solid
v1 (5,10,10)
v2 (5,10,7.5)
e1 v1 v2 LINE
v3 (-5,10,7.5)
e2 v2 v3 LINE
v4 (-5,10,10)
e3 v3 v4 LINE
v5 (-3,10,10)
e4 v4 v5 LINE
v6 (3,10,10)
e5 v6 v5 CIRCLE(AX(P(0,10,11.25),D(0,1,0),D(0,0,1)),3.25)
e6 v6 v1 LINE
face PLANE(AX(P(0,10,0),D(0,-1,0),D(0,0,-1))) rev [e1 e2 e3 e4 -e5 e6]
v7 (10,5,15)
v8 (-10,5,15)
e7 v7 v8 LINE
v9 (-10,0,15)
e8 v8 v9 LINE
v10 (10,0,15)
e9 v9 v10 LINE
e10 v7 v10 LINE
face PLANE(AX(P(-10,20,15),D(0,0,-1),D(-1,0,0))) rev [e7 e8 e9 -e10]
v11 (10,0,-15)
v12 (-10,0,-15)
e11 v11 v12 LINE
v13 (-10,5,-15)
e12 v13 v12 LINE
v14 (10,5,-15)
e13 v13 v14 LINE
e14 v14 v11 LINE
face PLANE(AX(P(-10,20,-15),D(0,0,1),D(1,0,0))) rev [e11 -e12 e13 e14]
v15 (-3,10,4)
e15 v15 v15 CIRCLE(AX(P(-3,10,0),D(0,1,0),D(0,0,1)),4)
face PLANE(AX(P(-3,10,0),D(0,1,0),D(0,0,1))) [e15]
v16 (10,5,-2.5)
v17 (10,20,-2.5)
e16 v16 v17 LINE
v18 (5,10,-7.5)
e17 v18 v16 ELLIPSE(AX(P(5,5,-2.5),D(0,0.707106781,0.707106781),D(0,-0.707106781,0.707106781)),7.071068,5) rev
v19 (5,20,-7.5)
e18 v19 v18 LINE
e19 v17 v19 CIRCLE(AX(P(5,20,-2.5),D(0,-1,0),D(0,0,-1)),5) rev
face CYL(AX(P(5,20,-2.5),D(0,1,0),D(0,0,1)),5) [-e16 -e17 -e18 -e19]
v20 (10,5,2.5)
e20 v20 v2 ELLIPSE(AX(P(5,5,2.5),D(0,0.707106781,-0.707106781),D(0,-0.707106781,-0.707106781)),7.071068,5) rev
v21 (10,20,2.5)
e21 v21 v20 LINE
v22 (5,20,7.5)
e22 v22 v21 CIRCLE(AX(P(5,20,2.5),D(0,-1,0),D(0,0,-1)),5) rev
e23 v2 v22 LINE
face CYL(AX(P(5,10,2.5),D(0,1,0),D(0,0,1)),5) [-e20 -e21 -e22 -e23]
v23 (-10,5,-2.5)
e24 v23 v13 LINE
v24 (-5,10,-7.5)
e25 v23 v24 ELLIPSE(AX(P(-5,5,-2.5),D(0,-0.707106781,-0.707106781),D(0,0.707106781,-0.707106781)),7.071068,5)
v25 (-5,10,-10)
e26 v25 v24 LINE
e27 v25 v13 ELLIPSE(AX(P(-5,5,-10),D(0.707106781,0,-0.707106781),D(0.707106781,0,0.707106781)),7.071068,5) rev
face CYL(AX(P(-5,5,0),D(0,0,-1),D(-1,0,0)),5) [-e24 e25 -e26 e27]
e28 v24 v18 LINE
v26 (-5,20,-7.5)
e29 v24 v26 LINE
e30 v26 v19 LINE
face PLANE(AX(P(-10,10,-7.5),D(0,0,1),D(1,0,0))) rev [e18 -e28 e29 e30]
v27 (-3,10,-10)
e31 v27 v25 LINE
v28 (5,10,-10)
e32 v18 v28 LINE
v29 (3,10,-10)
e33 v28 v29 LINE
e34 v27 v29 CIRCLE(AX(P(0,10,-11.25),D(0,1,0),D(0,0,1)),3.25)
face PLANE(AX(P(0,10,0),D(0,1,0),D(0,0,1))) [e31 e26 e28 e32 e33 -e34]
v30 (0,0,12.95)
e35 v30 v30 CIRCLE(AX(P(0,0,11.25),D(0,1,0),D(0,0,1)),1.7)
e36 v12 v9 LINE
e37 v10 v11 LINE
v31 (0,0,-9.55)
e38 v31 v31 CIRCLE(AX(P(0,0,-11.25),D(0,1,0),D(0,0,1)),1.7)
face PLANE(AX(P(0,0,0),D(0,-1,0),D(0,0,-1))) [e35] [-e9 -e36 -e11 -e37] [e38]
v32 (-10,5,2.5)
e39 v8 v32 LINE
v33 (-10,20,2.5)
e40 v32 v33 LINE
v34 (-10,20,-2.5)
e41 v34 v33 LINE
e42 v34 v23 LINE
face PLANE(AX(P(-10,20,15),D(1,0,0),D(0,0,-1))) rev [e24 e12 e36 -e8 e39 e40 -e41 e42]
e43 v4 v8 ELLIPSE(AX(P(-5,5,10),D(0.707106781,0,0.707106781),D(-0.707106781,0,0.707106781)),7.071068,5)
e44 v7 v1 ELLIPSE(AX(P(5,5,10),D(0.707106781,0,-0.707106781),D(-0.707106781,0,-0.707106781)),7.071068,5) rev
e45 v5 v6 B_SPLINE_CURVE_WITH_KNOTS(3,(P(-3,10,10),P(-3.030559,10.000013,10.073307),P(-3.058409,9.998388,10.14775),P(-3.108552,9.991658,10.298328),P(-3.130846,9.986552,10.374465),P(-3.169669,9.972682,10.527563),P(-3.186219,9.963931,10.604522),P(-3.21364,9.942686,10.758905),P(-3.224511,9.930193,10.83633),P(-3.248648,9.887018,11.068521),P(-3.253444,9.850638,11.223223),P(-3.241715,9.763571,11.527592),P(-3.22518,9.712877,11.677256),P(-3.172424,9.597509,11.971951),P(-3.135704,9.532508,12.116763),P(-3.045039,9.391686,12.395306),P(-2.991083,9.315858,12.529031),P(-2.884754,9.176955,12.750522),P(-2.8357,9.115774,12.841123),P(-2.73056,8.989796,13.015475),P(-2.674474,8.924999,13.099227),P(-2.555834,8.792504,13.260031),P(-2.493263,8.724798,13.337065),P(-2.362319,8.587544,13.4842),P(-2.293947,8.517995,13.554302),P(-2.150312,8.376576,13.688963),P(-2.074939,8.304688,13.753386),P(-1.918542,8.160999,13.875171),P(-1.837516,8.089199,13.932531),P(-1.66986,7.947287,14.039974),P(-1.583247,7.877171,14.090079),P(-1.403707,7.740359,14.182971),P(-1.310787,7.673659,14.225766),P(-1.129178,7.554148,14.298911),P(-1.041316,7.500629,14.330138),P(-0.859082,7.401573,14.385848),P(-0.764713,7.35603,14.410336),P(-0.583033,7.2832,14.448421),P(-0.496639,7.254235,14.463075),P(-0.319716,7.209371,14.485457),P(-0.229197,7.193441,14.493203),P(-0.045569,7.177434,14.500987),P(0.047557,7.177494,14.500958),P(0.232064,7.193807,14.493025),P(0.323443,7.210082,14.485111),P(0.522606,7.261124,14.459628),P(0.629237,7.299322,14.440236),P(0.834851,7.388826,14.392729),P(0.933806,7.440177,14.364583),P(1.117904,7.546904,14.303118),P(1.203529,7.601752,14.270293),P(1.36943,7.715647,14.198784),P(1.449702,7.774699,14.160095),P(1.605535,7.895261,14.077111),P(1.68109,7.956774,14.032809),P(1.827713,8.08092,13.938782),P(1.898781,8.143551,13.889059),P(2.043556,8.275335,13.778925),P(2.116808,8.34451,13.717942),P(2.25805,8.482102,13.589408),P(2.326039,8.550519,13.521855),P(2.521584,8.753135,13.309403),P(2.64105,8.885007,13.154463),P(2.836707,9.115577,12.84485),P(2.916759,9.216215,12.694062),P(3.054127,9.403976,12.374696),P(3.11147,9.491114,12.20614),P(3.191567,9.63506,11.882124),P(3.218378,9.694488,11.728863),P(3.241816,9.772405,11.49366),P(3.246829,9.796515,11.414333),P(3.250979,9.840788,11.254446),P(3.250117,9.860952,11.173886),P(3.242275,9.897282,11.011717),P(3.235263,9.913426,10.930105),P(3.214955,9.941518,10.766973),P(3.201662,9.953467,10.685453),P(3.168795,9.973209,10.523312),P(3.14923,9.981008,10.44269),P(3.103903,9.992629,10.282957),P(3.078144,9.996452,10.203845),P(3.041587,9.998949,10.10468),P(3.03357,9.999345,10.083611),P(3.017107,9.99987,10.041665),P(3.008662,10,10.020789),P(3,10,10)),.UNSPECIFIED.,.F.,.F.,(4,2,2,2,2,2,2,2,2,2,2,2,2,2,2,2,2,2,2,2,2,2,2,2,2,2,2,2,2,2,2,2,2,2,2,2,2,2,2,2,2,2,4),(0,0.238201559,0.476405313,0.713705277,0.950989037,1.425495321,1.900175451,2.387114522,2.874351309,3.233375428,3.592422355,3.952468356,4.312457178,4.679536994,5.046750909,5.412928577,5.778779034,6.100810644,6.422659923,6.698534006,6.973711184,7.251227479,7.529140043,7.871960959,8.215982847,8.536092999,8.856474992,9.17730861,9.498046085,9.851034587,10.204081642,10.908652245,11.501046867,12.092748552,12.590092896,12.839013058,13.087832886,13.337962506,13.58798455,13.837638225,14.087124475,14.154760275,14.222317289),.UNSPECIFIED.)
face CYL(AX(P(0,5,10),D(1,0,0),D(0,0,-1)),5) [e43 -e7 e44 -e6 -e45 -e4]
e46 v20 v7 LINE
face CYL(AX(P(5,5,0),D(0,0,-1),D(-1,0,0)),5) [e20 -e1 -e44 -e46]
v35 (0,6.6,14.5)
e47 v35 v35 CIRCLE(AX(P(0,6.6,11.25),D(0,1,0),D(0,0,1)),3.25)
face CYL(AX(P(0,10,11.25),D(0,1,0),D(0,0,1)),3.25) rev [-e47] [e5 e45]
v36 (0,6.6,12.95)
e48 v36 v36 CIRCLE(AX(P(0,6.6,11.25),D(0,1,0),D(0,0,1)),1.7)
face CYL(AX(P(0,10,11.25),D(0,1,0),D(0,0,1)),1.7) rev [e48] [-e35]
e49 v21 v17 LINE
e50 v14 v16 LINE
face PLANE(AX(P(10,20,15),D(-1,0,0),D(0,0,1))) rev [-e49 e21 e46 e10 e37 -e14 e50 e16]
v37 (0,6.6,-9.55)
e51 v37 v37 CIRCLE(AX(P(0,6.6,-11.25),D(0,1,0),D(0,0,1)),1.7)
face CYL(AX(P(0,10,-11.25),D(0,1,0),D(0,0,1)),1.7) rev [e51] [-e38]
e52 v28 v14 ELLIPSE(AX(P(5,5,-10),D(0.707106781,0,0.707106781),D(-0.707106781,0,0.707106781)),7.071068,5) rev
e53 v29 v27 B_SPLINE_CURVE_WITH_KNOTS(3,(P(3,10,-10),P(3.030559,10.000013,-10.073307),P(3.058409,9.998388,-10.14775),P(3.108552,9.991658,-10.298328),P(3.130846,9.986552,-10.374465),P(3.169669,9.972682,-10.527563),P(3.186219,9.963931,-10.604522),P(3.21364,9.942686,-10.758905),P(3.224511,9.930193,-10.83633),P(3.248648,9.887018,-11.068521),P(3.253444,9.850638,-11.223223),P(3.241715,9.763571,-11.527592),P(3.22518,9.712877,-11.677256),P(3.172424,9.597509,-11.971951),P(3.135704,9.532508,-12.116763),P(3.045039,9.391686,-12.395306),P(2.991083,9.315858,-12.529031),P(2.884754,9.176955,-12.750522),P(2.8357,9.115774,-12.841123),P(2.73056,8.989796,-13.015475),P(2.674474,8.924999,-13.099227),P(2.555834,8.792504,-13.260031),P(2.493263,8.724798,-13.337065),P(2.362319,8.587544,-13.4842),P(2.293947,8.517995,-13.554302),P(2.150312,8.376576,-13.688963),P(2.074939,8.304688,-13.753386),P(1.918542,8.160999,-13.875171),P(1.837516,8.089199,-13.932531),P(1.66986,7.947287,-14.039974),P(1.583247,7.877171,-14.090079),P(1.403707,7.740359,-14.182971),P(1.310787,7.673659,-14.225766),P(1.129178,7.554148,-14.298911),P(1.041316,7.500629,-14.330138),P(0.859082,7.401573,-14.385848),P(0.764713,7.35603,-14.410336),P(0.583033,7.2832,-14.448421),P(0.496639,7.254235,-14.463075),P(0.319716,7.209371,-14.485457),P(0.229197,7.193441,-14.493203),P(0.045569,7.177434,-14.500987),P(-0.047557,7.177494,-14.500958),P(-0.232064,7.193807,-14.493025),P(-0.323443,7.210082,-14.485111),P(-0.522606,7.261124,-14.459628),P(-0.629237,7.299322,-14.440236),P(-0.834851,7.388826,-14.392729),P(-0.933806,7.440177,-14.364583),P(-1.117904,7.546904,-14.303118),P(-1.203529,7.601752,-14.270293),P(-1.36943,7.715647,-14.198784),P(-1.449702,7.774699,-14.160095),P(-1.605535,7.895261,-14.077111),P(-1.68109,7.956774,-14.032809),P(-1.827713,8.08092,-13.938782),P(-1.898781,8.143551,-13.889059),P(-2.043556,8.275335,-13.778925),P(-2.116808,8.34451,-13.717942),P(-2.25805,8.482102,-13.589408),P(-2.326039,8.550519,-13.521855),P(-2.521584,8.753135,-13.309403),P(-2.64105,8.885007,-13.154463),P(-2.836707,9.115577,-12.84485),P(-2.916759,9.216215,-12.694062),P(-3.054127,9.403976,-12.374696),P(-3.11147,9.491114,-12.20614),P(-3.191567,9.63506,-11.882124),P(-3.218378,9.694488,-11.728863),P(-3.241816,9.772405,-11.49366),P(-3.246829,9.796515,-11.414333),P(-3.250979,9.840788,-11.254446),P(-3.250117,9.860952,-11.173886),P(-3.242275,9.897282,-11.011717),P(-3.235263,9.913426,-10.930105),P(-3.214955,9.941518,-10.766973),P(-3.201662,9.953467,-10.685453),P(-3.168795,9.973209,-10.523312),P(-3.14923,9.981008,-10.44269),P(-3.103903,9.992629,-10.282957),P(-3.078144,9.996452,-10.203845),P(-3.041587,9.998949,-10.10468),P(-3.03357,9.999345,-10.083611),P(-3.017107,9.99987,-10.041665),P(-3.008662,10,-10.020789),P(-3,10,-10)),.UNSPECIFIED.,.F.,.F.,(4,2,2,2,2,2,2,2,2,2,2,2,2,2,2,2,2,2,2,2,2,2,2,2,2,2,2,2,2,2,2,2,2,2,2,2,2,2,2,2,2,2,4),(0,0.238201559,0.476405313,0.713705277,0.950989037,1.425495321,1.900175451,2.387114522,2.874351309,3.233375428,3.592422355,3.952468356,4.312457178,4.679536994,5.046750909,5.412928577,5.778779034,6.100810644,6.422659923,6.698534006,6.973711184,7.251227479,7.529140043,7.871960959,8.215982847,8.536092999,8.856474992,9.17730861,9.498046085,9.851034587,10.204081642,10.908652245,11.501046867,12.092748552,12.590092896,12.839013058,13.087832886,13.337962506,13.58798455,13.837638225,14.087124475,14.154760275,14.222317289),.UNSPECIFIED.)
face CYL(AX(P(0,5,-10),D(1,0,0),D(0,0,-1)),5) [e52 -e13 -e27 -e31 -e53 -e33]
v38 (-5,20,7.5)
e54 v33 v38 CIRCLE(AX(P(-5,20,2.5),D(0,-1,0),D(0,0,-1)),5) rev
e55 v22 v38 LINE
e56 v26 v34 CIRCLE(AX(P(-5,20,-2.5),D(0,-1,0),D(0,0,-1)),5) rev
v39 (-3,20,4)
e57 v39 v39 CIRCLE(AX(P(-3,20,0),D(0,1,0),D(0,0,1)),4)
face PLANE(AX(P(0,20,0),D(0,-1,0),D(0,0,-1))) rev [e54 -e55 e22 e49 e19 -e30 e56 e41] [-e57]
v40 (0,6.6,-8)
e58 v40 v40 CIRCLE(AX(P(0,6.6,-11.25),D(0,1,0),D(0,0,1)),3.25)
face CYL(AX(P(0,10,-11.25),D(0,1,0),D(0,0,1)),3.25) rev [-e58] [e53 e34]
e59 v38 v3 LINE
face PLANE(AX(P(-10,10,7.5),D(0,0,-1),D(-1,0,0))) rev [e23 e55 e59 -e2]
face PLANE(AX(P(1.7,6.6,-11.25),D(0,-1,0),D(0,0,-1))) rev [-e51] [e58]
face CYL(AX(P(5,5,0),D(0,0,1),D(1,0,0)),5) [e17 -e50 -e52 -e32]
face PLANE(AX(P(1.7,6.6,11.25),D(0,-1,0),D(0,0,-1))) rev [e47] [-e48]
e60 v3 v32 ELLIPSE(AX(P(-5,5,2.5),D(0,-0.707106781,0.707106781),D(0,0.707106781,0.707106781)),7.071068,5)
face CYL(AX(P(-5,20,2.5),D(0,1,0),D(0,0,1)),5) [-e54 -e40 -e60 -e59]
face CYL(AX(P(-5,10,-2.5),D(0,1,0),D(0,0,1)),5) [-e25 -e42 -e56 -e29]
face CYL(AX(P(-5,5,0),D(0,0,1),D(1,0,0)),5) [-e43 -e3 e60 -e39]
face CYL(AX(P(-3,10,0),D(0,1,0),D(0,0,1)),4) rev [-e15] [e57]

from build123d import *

# Parameters (mm, degrees)
SKETCH1_W                                           = 20
SKETCH1_H                                           = 30
BOSS_EXTRUDE1_DEPTH                                 = 20
SKETCH2_R                                           = 4
CUT_EXTRUDE1_DEPTH                                  = 10
SKETCH3_W                                           = 20
SKETCH3_H                                           = 7.5
CUT_EXTRUDE2_DEPTH                                  = 10
CBORE_FOR_M3_HEX_SOCKET_HEAD_CAP_SCREW1_D           = 3.4
CBORE_FOR_M3_HEX_SOCKET_HEAD_CAP_SCREW1_CBORE_D     = 6.5
CBORE_FOR_M3_HEX_SOCKET_HEAD_CAP_SCREW1_CBORE_DEPTH = 3.4
FILLET2_R                                           = 5


with BuildPart() as part:
    # Sketch1 → Boss-Extrude1 (new body)
    with BuildSketch(Plane(origin=(0, 0, 0), x_dir=(1, 0, 0), z_dir=(0, 1, 0))):
        Rectangle(SKETCH1_W, SKETCH1_H)
    extrude(amount=BOSS_EXTRUDE1_DEPTH)

    # Sketch2 → Cut-Extrude1 (cut)
    with BuildSketch(Plane(origin=(0, 20, 0), x_dir=(1, 0, 0), z_dir=(0, 1, 0))):
        with Locations(Location((-3, 0, 0), (0, 0, 270))):
            Circle(SKETCH2_R)
    extrude(amount=-CUT_EXTRUDE1_DEPTH, mode=Mode.SUBTRACT)

    # Sketch3 → Cut-Extrude2 (cut)
    with BuildSketch(Plane(origin=(0, 20, 0), x_dir=(1, 0, 0), z_dir=(0, 1, 0))):
        with Locations((0, -11.25)):
            Rectangle(SKETCH3_W, SKETCH3_H)
        with Locations((0, 11.25)):
            Rectangle(SKETCH3_W, SKETCH3_H)
    extrude(amount=-CUT_EXTRUDE2_DEPTH, mode=Mode.SUBTRACT)

    # CBORE for M3 Hex Socket Head Cap Screw1 (through all)
    with Locations(Plane(origin=(0, 10, 0), x_dir=(1, 0, 0), z_dir=(0, 1, 0))):
        with Locations((0, -11.25), (0, 11.25)):
            CounterBoreHole(CBORE_FOR_M3_HEX_SOCKET_HEAD_CAP_SCREW1_D / 2, CBORE_FOR_M3_HEX_SOCKET_HEAD_CAP_SCREW1_CBORE_D / 2, CBORE_FOR_M3_HEX_SOCKET_HEAD_CAP_SCREW1_CBORE_DEPTH)

    # Fillet2
    # the kernel refuses this fillet: 5 mm, written as the material it takes off along each edge
    with BuildSketch(Plane(origin=(-10, 10, 7.5), x_dir=(1, 0, 0), z_dir=(0, 0, 1)), Plane(origin=(-10, 10, -7.5), x_dir=(0, -1, 0), z_dir=(0, 0, -1)), Plane(origin=(10, 10, -15), x_dir=(0, -1, 0), z_dir=(0, 0, 1))) as fillet2_piece_1:
        with BuildLine():
            CenterArc((FILLET2_R, -FILLET2_R), FILLET2_R, 90, 90)
            Line((0, -FILLET2_R), (-FILLET2_R * 0.02, -FILLET2_R))
            Line((-FILLET2_R * 0.02, -FILLET2_R), (-FILLET2_R * 0.02, FILLET2_R * 0.02))
            Line((-FILLET2_R * 0.02, FILLET2_R * 0.02), (FILLET2_R, FILLET2_R * 0.02))
            Line((FILLET2_R, FILLET2_R * 0.02), (FILLET2_R, 0))
        make_face()
    extrude(amount=7.5, mode=Mode.SUBTRACT)
    with BuildSketch(Plane(origin=(-10, 20, 7.5), x_dir=(0, 0, -1), z_dir=(0, -1, 0)), Plane(origin=(10, 20, -7.5), x_dir=(0, 0, 1), z_dir=(0, -1, 0))) as fillet2_piece_2:
        with BuildLine():
            CenterArc((FILLET2_R, FILLET2_R), FILLET2_R, 180, 90)
            Line((0, FILLET2_R), (-FILLET2_R * 0.02, FILLET2_R))
            Line((-FILLET2_R * 0.02, FILLET2_R), (-FILLET2_R * 0.02, -FILLET2_R * 0.02))
            Line((-FILLET2_R * 0.02, -FILLET2_R * 0.02), (FILLET2_R, -FILLET2_R * 0.02))
            Line((FILLET2_R, -FILLET2_R * 0.02), (FILLET2_R, 0))
        make_face()
    extrude(amount=10, mode=Mode.SUBTRACT)
    with BuildSketch(Plane(origin=(10, 10, 15), x_dir=(0, -1, 0), z_dir=(0, 0, -1))) as fillet2_piece_3:
        with BuildLine():
            CenterArc((FILLET2_R, FILLET2_R), FILLET2_R, 180, 90)
            Line((0, FILLET2_R), (-FILLET2_R * 0.02, FILLET2_R))
            Line((-FILLET2_R * 0.02, FILLET2_R), (-FILLET2_R * 0.02, -FILLET2_R * 0.02))
            Line((-FILLET2_R * 0.02, -FILLET2_R * 0.02), (FILLET2_R, -FILLET2_R * 0.02))
            Line((FILLET2_R, -FILLET2_R * 0.02), (FILLET2_R, 0))
        make_face()
    extrude(amount=7.5, mode=Mode.SUBTRACT)
    with BuildSketch(Plane(origin=(10, 20, 7.5), x_dir=(0, 0, -1), z_dir=(0, -1, 0)), Plane(origin=(-10, 20, -7.5), x_dir=(0, 0, 1), z_dir=(0, -1, 0))) as fillet2_piece_4:
        with BuildLine():
            CenterArc((FILLET2_R, -FILLET2_R), FILLET2_R, 90, 90)
            Line((0, -FILLET2_R), (-FILLET2_R * 0.02, -FILLET2_R))
            Line((-FILLET2_R * 0.02, -FILLET2_R), (-FILLET2_R * 0.02, FILLET2_R * 0.02))
            Line((-FILLET2_R * 0.02, FILLET2_R * 0.02), (FILLET2_R, FILLET2_R * 0.02))
            Line((FILLET2_R, FILLET2_R * 0.02), (FILLET2_R, 0))
        make_face()
    extrude(amount=10, mode=Mode.SUBTRACT)
    with BuildSketch(Plane(origin=(-10, 10, 15), x_dir=(0, -1, 0), z_dir=(1, 0, 0))) as fillet2_piece_5:
        with BuildLine():
            CenterArc((FILLET2_R, FILLET2_R), FILLET2_R, 180, 90)
            Line((0, FILLET2_R), (-FILLET2_R * 0.02, FILLET2_R))
            Line((-FILLET2_R * 0.02, FILLET2_R), (-FILLET2_R * 0.02, -FILLET2_R * 0.02))
            Line((-FILLET2_R * 0.02, -FILLET2_R * 0.02), (FILLET2_R, -FILLET2_R * 0.02))
            Line((FILLET2_R, -FILLET2_R * 0.02), (FILLET2_R, 0))
        make_face()
    extrude(amount=20, mode=Mode.SUBTRACT)
    with BuildSketch(Plane(origin=(-10, 10, -15), x_dir=(0, -1, 0), z_dir=(1, 0, 0))) as fillet2_piece_6:
        with BuildLine():
            CenterArc((FILLET2_R, -FILLET2_R), FILLET2_R, 90, 90)
            Line((0, -FILLET2_R), (-FILLET2_R * 0.02, -FILLET2_R))
            Line((-FILLET2_R * 0.02, -FILLET2_R), (-FILLET2_R * 0.02, FILLET2_R * 0.02))
            Line((-FILLET2_R * 0.02, FILLET2_R * 0.02), (FILLET2_R, FILLET2_R * 0.02))
            Line((FILLET2_R, FILLET2_R * 0.02), (FILLET2_R, 0))
        make_face()
    extrude(amount=20, mode=Mode.SUBTRACT)
    with BuildSketch(Plane(origin=(-10, 10, -5), x_dir=(1, 0, 0), z_dir=(0, 0, 1))) as fillet2_piece_7a_section:
        with BuildLine():
            CenterArc((FILLET2_R, -FILLET2_R), FILLET2_R, 90, 90)
            Line((0, -FILLET2_R), (-FILLET2_R * 0.02, -FILLET2_R))
            Line((-FILLET2_R * 0.02, -FILLET2_R), (-FILLET2_R * 0.02, FILLET2_R * 0.02))
            Line((-FILLET2_R * 0.02, FILLET2_R * 0.02), (FILLET2_R, FILLET2_R * 0.02))
            Line((FILLET2_R, FILLET2_R * 0.02), (FILLET2_R, 0))
        make_face()
    fillet2_piece_7a = extrude(amount=20, mode=Mode.PRIVATE)
    fillet2_piece_7a = split(fillet2_piece_7a, bisect_by=Plane(origin=(-8.868024429, 8.868024429, 7.5), z_dir=(0, 0, -1)), keep=Keep.TOP, mode=Mode.PRIVATE)
    with BuildSketch(Plane(origin=(-10, 20, 7.5), x_dir=(0, 0, -1), z_dir=(0, -1, 0))) as fillet2_piece_7b_section:
        with BuildLine():
            CenterArc((FILLET2_R, FILLET2_R), FILLET2_R, 180, 90)
            Line((0, FILLET2_R), (-FILLET2_R * 0.02, FILLET2_R))
            Line((-FILLET2_R * 0.02, FILLET2_R), (-FILLET2_R * 0.02, -FILLET2_R * 0.02))
            Line((-FILLET2_R * 0.02, -FILLET2_R * 0.02), (FILLET2_R, -FILLET2_R * 0.02))
            Line((FILLET2_R, -FILLET2_R * 0.02), (FILLET2_R, 0))
        make_face()
    fillet2_piece_7b = extrude(amount=22.5, mode=Mode.PRIVATE)
    fillet2_piece_7b = split(fillet2_piece_7b, bisect_by=Plane(origin=(-8.868024429, 10, 6.368024429), z_dir=(0, -1, 0)), keep=Keep.TOP, mode=Mode.PRIVATE)
    fillet2_piece_7 = fillet2_piece_7a & fillet2_piece_7b
    add(fillet2_piece_7, mode=Mode.SUBTRACT)
    with BuildSketch(Plane(origin=(-22.5, 10, 15), x_dir=(0, -1, 0), z_dir=(1, 0, 0))) as fillet2_piece_8a_section:
        with BuildLine():
            CenterArc((FILLET2_R, FILLET2_R), FILLET2_R, 180, 90)
            Line((0, FILLET2_R), (-FILLET2_R * 0.02, FILLET2_R))
            Line((-FILLET2_R * 0.02, FILLET2_R), (-FILLET2_R * 0.02, -FILLET2_R * 0.02))
            Line((-FILLET2_R * 0.02, -FILLET2_R * 0.02), (FILLET2_R, -FILLET2_R * 0.02))
            Line((FILLET2_R, -FILLET2_R * 0.02), (FILLET2_R, 0))
        make_face()
    fillet2_piece_8a = extrude(amount=32.5, mode=Mode.PRIVATE)
    fillet2_piece_8a = split(fillet2_piece_8a, bisect_by=Plane(origin=(-10, 8.868024429, 13.868024429), z_dir=(-1, 0, 0)), keep=Keep.TOP, mode=Mode.PRIVATE)
    with BuildSketch(Plane(origin=(-10, 10, 7.5), x_dir=(1, 0, 0), z_dir=(0, 0, 1))) as fillet2_piece_8b_section:
        with BuildLine():
            CenterArc((FILLET2_R, -FILLET2_R), FILLET2_R, 90, 90)
            Line((0, -FILLET2_R), (-FILLET2_R * 0.02, -FILLET2_R))
            Line((-FILLET2_R * 0.02, -FILLET2_R), (-FILLET2_R * 0.02, FILLET2_R * 0.02))
            Line((-FILLET2_R * 0.02, FILLET2_R * 0.02), (FILLET2_R, FILLET2_R * 0.02))
            Line((FILLET2_R, FILLET2_R * 0.02), (FILLET2_R, 0))
        make_face()
    fillet2_piece_8b = extrude(amount=20, mode=Mode.PRIVATE)
    fillet2_piece_8b = split(fillet2_piece_8b, bisect_by=Plane(origin=(-8.868024429, 8.868024429, 15), z_dir=(0, 0, 1)), keep=Keep.TOP, mode=Mode.PRIVATE)
    fillet2_piece_8 = fillet2_piece_8a & fillet2_piece_8b
    add(fillet2_piece_8, mode=Mode.SUBTRACT)
    with BuildSketch(Plane(origin=(-10, 10, 15), x_dir=(0, -1, 0), z_dir=(1, 0, 0))) as fillet2_piece_9a_section:
        with BuildLine():
            CenterArc((FILLET2_R, FILLET2_R), FILLET2_R, 180, 90)
            Line((0, FILLET2_R), (-FILLET2_R * 0.02, FILLET2_R))
            Line((-FILLET2_R * 0.02, FILLET2_R), (-FILLET2_R * 0.02, -FILLET2_R * 0.02))
            Line((-FILLET2_R * 0.02, -FILLET2_R * 0.02), (FILLET2_R, -FILLET2_R * 0.02))
            Line((FILLET2_R, -FILLET2_R * 0.02), (FILLET2_R, 0))
        make_face()
    fillet2_piece_9a = extrude(amount=32.5, mode=Mode.PRIVATE)
    fillet2_piece_9a = split(fillet2_piece_9a, bisect_by=Plane(origin=(10, 8.868024429, 13.868024429), z_dir=(1, 0, 0)), keep=Keep.TOP, mode=Mode.PRIVATE)
    with BuildSketch(Plane(origin=(10, 10, 27.5), x_dir=(0, -1, 0), z_dir=(0, 0, -1))) as fillet2_piece_9b_section:
        with BuildLine():
            CenterArc((FILLET2_R, FILLET2_R), FILLET2_R, 180, 90)
            Line((0, FILLET2_R), (-FILLET2_R * 0.02, FILLET2_R))
            Line((-FILLET2_R * 0.02, FILLET2_R), (-FILLET2_R * 0.02, -FILLET2_R * 0.02))
            Line((-FILLET2_R * 0.02, -FILLET2_R * 0.02), (FILLET2_R, -FILLET2_R * 0.02))
            Line((FILLET2_R, -FILLET2_R * 0.02), (FILLET2_R, 0))
        make_face()
    fillet2_piece_9b = extrude(amount=20, mode=Mode.PRIVATE)
    fillet2_piece_9b = split(fillet2_piece_9b, bisect_by=Plane(origin=(8.868024429, 8.868024429, 15), z_dir=(0, 0, 1)), keep=Keep.TOP, mode=Mode.PRIVATE)
    fillet2_piece_9 = fillet2_piece_9a & fillet2_piece_9b
    add(fillet2_piece_9, mode=Mode.SUBTRACT)
    with BuildSketch(Plane(origin=(10, 20, 7.5), x_dir=(0, 0, -1), z_dir=(0, -1, 0))) as fillet2_piece_10a_section:
        with BuildLine():
            CenterArc((FILLET2_R, -FILLET2_R), FILLET2_R, 90, 90)
            Line((0, -FILLET2_R), (-FILLET2_R * 0.02, -FILLET2_R))
            Line((-FILLET2_R * 0.02, -FILLET2_R), (-FILLET2_R * 0.02, FILLET2_R * 0.02))
            Line((-FILLET2_R * 0.02, FILLET2_R * 0.02), (FILLET2_R, FILLET2_R * 0.02))
            Line((FILLET2_R, FILLET2_R * 0.02), (FILLET2_R, 0))
        make_face()
    fillet2_piece_10a = extrude(amount=22.5, mode=Mode.PRIVATE)
    fillet2_piece_10a = split(fillet2_piece_10a, bisect_by=Plane(origin=(8.868024429, 10, 6.368024429), z_dir=(0, -1, 0)), keep=Keep.TOP, mode=Mode.PRIVATE)
    with BuildSketch(Plane(origin=(10, 10, 15), x_dir=(0, -1, 0), z_dir=(0, 0, -1))) as fillet2_piece_10b_section:
        with BuildLine():
            CenterArc((FILLET2_R, FILLET2_R), FILLET2_R, 180, 90)
            Line((0, FILLET2_R), (-FILLET2_R * 0.02, FILLET2_R))
            Line((-FILLET2_R * 0.02, FILLET2_R), (-FILLET2_R * 0.02, -FILLET2_R * 0.02))
            Line((-FILLET2_R * 0.02, -FILLET2_R * 0.02), (FILLET2_R, -FILLET2_R * 0.02))
            Line((FILLET2_R, -FILLET2_R * 0.02), (FILLET2_R, 0))
        make_face()
    fillet2_piece_10b = extrude(amount=20, mode=Mode.PRIVATE)
    fillet2_piece_10b = split(fillet2_piece_10b, bisect_by=Plane(origin=(8.868024429, 8.868024429, 7.5), z_dir=(0, 0, -1)), keep=Keep.TOP, mode=Mode.PRIVATE)
    fillet2_piece_10 = fillet2_piece_10a & fillet2_piece_10b
    add(fillet2_piece_10, mode=Mode.SUBTRACT)
    with BuildSketch(Plane(origin=(-10, 20, -7.5), x_dir=(0, 0, 1), z_dir=(0, -1, 0))) as fillet2_piece_11a_section:
        with BuildLine():
            CenterArc((FILLET2_R, -FILLET2_R), FILLET2_R, 90, 90)
            Line((0, -FILLET2_R), (-FILLET2_R * 0.02, -FILLET2_R))
            Line((-FILLET2_R * 0.02, -FILLET2_R), (-FILLET2_R * 0.02, FILLET2_R * 0.02))
            Line((-FILLET2_R * 0.02, FILLET2_R * 0.02), (FILLET2_R, FILLET2_R * 0.02))
            Line((FILLET2_R, FILLET2_R * 0.02), (FILLET2_R, 0))
        make_face()
    fillet2_piece_11a = extrude(amount=22.5, mode=Mode.PRIVATE)
    fillet2_piece_11a = split(fillet2_piece_11a, bisect_by=Plane(origin=(-8.868024429, 10, -6.368024429), z_dir=(0, -1, 0)), keep=Keep.TOP, mode=Mode.PRIVATE)
    with BuildSketch(Plane(origin=(-10, 10, 5), x_dir=(0, -1, 0), z_dir=(0, 0, -1))) as fillet2_piece_11b_section:
        with BuildLine():
            CenterArc((FILLET2_R, -FILLET2_R), FILLET2_R, 90, 90)
            Line((0, -FILLET2_R), (-FILLET2_R * 0.02, -FILLET2_R))
            Line((-FILLET2_R * 0.02, -FILLET2_R), (-FILLET2_R * 0.02, FILLET2_R * 0.02))
            Line((-FILLET2_R * 0.02, FILLET2_R * 0.02), (FILLET2_R, FILLET2_R * 0.02))
            Line((FILLET2_R, FILLET2_R * 0.02), (FILLET2_R, 0))
        make_face()
    fillet2_piece_11b = extrude(amount=20, mode=Mode.PRIVATE)
    fillet2_piece_11b = split(fillet2_piece_11b, bisect_by=Plane(origin=(-8.868024429, 8.868024429, -7.5), z_dir=(0, 0, 1)), keep=Keep.TOP, mode=Mode.PRIVATE)
    fillet2_piece_11 = fillet2_piece_11a & fillet2_piece_11b
    add(fillet2_piece_11, mode=Mode.SUBTRACT)
    with BuildSketch(Plane(origin=(-10, 10, -7.5), x_dir=(0, -1, 0), z_dir=(0, 0, -1))) as fillet2_piece_12a_section:
        with BuildLine():
            CenterArc((FILLET2_R, -FILLET2_R), FILLET2_R, 90, 90)
            Line((0, -FILLET2_R), (-FILLET2_R * 0.02, -FILLET2_R))
            Line((-FILLET2_R * 0.02, -FILLET2_R), (-FILLET2_R * 0.02, FILLET2_R * 0.02))
            Line((-FILLET2_R * 0.02, FILLET2_R * 0.02), (FILLET2_R, FILLET2_R * 0.02))
            Line((FILLET2_R, FILLET2_R * 0.02), (FILLET2_R, 0))
        make_face()
    fillet2_piece_12a = extrude(amount=20, mode=Mode.PRIVATE)
    fillet2_piece_12a = split(fillet2_piece_12a, bisect_by=Plane(origin=(-8.868024429, 8.868024429, -15), z_dir=(0, 0, -1)), keep=Keep.TOP, mode=Mode.PRIVATE)
    with BuildSketch(Plane(origin=(-22.5, 10, -15), x_dir=(0, -1, 0), z_dir=(1, 0, 0))) as fillet2_piece_12b_section:
        with BuildLine():
            CenterArc((FILLET2_R, -FILLET2_R), FILLET2_R, 90, 90)
            Line((0, -FILLET2_R), (-FILLET2_R * 0.02, -FILLET2_R))
            Line((-FILLET2_R * 0.02, -FILLET2_R), (-FILLET2_R * 0.02, FILLET2_R * 0.02))
            Line((-FILLET2_R * 0.02, FILLET2_R * 0.02), (FILLET2_R, FILLET2_R * 0.02))
            Line((FILLET2_R, FILLET2_R * 0.02), (FILLET2_R, 0))
        make_face()
    fillet2_piece_12b = extrude(amount=32.5, mode=Mode.PRIVATE)
    fillet2_piece_12b = split(fillet2_piece_12b, bisect_by=Plane(origin=(-10, 8.868024429, -13.868024429), z_dir=(-1, 0, 0)), keep=Keep.TOP, mode=Mode.PRIVATE)
    fillet2_piece_12 = fillet2_piece_12a & fillet2_piece_12b
    add(fillet2_piece_12, mode=Mode.SUBTRACT)
    with BuildSketch(Plane(origin=(10, 10, -27.5), x_dir=(0, -1, 0), z_dir=(0, 0, 1))) as fillet2_piece_13a_section:
        with BuildLine():
            CenterArc((FILLET2_R, -FILLET2_R), FILLET2_R, 90, 90)
            Line((0, -FILLET2_R), (-FILLET2_R * 0.02, -FILLET2_R))
            Line((-FILLET2_R * 0.02, -FILLET2_R), (-FILLET2_R * 0.02, FILLET2_R * 0.02))
            Line((-FILLET2_R * 0.02, FILLET2_R * 0.02), (FILLET2_R, FILLET2_R * 0.02))
            Line((FILLET2_R, FILLET2_R * 0.02), (FILLET2_R, 0))
        make_face()
    fillet2_piece_13a = extrude(amount=20, mode=Mode.PRIVATE)
    fillet2_piece_13a = split(fillet2_piece_13a, bisect_by=Plane(origin=(8.868024429, 8.868024429, -15), z_dir=(0, 0, -1)), keep=Keep.TOP, mode=Mode.PRIVATE)
    with BuildSketch(Plane(origin=(-10, 10, -15), x_dir=(0, -1, 0), z_dir=(1, 0, 0))) as fillet2_piece_13b_section:
        with BuildLine():
            CenterArc((FILLET2_R, -FILLET2_R), FILLET2_R, 90, 90)
            Line((0, -FILLET2_R), (-FILLET2_R * 0.02, -FILLET2_R))
            Line((-FILLET2_R * 0.02, -FILLET2_R), (-FILLET2_R * 0.02, FILLET2_R * 0.02))
            Line((-FILLET2_R * 0.02, FILLET2_R * 0.02), (FILLET2_R, FILLET2_R * 0.02))
            Line((FILLET2_R, FILLET2_R * 0.02), (FILLET2_R, 0))
        make_face()
    fillet2_piece_13b = extrude(amount=32.5, mode=Mode.PRIVATE)
    fillet2_piece_13b = split(fillet2_piece_13b, bisect_by=Plane(origin=(10, 8.868024429, -13.868024429), z_dir=(1, 0, 0)), keep=Keep.TOP, mode=Mode.PRIVATE)
    fillet2_piece_13 = fillet2_piece_13a & fillet2_piece_13b
    add(fillet2_piece_13, mode=Mode.SUBTRACT)
    with BuildSketch(Plane(origin=(10, 10, -15), x_dir=(0, -1, 0), z_dir=(0, 0, 1))) as fillet2_piece_14a_section:
        with BuildLine():
            CenterArc((FILLET2_R, -FILLET2_R), FILLET2_R, 90, 90)
            Line((0, -FILLET2_R), (-FILLET2_R * 0.02, -FILLET2_R))
            Line((-FILLET2_R * 0.02, -FILLET2_R), (-FILLET2_R * 0.02, FILLET2_R * 0.02))
            Line((-FILLET2_R * 0.02, FILLET2_R * 0.02), (FILLET2_R, FILLET2_R * 0.02))
            Line((FILLET2_R, FILLET2_R * 0.02), (FILLET2_R, 0))
        make_face()
    fillet2_piece_14a = extrude(amount=20, mode=Mode.PRIVATE)
    fillet2_piece_14a = split(fillet2_piece_14a, bisect_by=Plane(origin=(8.868024429, 8.868024429, -7.5), z_dir=(0, 0, 1)), keep=Keep.TOP, mode=Mode.PRIVATE)
    with BuildSketch(Plane(origin=(10, 20, -7.5), x_dir=(0, 0, 1), z_dir=(0, -1, 0))) as fillet2_piece_14b_section:
        with BuildLine():
            CenterArc((FILLET2_R, FILLET2_R), FILLET2_R, 180, 90)
            Line((0, FILLET2_R), (-FILLET2_R * 0.02, FILLET2_R))
            Line((-FILLET2_R * 0.02, FILLET2_R), (-FILLET2_R * 0.02, -FILLET2_R * 0.02))
            Line((-FILLET2_R * 0.02, -FILLET2_R * 0.02), (FILLET2_R, -FILLET2_R * 0.02))
            Line((FILLET2_R, -FILLET2_R * 0.02), (FILLET2_R, 0))
        make_face()
    fillet2_piece_14b = extrude(amount=22.5, mode=Mode.PRIVATE)
    fillet2_piece_14b = split(fillet2_piece_14b, bisect_by=Plane(origin=(8.868024429, 10, -6.368024429), z_dir=(0, -1, 0)), keep=Keep.TOP, mode=Mode.PRIVATE)
    fillet2_piece_14 = fillet2_piece_14a & fillet2_piece_14b
    add(fillet2_piece_14, mode=Mode.SUBTRACT)


solid = part.part
